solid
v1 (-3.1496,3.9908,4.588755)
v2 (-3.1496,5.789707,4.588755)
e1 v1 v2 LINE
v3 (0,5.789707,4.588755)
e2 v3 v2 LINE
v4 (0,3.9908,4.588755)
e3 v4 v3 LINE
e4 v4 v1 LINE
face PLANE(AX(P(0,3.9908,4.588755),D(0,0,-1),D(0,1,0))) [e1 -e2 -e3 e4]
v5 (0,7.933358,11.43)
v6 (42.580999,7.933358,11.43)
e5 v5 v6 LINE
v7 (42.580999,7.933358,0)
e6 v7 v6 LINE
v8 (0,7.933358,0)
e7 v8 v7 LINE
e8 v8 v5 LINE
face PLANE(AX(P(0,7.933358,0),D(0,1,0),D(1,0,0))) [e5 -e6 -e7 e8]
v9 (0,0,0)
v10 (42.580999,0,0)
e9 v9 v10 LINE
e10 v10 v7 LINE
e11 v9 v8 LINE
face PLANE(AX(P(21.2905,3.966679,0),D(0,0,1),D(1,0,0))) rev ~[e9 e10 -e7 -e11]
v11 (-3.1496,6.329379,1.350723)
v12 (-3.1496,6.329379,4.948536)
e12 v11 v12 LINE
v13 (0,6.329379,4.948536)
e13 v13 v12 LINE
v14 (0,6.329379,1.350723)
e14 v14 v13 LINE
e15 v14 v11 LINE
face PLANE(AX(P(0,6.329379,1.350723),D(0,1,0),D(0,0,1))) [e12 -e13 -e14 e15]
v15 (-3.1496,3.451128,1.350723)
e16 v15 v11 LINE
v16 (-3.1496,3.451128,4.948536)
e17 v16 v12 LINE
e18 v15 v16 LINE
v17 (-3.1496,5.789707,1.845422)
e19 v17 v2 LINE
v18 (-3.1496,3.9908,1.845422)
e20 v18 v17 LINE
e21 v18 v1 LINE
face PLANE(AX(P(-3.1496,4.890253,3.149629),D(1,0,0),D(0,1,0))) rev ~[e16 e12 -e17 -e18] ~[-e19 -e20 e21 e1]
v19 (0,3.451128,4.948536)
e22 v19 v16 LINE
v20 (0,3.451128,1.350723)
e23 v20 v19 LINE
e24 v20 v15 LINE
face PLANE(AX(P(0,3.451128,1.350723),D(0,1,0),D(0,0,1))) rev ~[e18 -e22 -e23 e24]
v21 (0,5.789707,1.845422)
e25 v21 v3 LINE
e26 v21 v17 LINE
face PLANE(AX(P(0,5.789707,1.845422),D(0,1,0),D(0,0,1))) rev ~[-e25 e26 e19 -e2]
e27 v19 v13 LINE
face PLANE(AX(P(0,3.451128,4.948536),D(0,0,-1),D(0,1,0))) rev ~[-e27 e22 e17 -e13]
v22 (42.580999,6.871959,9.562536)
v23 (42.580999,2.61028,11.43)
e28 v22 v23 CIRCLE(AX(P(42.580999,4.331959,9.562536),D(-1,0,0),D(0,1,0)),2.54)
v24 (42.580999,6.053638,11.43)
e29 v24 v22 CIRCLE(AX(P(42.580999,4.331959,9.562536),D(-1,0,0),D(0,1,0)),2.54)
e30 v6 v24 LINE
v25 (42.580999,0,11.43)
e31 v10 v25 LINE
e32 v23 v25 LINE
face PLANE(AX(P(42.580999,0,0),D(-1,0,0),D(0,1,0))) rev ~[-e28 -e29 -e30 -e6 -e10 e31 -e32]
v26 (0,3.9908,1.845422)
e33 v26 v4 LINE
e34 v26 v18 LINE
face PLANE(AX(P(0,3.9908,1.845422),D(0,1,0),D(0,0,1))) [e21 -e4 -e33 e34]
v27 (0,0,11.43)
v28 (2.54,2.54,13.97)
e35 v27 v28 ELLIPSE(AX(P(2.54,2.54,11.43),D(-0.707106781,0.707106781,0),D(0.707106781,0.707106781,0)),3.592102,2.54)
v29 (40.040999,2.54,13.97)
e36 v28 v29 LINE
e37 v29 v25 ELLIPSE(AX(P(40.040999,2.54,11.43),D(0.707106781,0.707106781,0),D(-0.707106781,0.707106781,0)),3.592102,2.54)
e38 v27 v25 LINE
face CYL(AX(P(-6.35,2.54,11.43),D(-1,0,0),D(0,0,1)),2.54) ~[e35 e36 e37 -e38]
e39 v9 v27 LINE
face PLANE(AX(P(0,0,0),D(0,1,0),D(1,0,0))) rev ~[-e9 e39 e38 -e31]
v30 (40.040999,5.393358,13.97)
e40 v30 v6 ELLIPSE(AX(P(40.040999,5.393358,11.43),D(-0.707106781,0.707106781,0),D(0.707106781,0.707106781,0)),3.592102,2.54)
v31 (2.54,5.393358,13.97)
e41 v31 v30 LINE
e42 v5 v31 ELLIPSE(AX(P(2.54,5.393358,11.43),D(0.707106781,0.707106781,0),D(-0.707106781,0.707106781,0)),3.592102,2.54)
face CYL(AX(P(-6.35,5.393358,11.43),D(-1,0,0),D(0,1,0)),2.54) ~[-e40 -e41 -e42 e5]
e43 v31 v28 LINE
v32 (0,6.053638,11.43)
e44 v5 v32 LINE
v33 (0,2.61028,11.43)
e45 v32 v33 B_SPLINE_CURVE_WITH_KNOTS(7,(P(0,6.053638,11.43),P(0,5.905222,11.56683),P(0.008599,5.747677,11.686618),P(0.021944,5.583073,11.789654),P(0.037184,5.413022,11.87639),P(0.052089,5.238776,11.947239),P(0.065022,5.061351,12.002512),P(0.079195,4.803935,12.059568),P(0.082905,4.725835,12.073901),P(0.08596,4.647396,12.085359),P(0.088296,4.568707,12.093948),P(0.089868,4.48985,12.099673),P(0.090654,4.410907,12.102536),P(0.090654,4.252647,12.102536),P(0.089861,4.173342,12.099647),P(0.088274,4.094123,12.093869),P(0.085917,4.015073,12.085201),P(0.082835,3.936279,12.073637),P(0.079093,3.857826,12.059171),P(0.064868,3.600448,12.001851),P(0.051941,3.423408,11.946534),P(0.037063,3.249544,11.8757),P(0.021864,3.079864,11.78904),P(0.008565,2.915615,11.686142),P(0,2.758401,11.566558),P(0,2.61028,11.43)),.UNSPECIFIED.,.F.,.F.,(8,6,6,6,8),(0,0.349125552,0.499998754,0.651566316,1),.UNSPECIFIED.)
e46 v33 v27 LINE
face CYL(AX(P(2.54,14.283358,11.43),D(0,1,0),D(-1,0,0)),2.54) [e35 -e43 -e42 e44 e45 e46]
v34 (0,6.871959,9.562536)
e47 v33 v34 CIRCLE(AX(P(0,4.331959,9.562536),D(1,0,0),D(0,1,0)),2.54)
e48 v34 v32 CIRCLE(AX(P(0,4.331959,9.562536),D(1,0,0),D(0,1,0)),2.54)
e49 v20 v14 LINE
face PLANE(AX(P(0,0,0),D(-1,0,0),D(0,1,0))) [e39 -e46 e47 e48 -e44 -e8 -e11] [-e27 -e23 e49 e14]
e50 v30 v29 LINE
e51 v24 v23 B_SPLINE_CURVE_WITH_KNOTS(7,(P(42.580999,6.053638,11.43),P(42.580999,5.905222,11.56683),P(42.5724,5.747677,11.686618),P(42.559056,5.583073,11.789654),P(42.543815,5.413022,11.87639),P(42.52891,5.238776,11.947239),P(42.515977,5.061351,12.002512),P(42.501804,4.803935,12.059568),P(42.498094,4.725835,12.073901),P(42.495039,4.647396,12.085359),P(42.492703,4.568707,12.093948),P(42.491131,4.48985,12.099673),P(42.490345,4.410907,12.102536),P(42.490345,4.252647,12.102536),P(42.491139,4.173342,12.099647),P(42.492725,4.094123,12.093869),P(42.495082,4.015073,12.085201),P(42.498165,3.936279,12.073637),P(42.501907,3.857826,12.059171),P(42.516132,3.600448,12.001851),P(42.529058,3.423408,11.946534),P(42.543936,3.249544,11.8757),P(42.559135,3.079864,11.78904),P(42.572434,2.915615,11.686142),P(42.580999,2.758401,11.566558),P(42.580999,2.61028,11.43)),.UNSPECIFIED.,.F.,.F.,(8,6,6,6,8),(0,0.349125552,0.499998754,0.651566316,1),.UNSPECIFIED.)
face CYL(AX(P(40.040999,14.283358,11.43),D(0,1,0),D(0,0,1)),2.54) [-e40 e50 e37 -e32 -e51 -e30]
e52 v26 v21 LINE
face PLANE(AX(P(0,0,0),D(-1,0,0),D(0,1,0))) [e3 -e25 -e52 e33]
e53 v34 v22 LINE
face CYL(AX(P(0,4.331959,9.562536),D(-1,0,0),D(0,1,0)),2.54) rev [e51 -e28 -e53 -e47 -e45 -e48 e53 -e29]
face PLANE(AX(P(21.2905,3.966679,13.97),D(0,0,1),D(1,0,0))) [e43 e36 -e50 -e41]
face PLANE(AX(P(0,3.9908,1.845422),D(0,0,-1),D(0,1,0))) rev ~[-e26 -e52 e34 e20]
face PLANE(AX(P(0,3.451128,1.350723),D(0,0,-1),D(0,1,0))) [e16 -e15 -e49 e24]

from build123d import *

# Parameters (mm, degrees)
F0_W        = 42.580999434
F0_H        = 7.9333577305
F1_DEPTH    = 13.97
F2_R        = 2.54
F3_DEPTH    = 45.0342
F4_T1_DEPTH = 20.6333577305
F4_T3_DEPTH = 55.280999434
F5_W        = 2.8782505542
F5_H        = 3.5978133092
F5_W_2      = 1.7989068292
F5_H_2      = 2.7433328796
F6_DEPTH    = 3.1496


# Not quite as in the source:
# - a fillet or chamfer that OpenCascade refuses, or shapes differently, is made with other operations: its cross-section is extruded or revolved along the edge and cut away or added


with BuildPart() as f1:
    # F0 (on Top) → F1 (new body)
    with BuildSketch(Plane.XY):
        with Locations((21.290499717, 3.9666788653)):
            Rectangle(F0_W, F0_H)
    extrude(amount=F1_DEPTH)

    # F2 (on Right) → F3 (cut)
    with BuildSketch(Plane.YZ):
        with Locations((4.3319589458, 9.5625361428)):
            Circle(F2_R)
    extrude(amount=F3_DEPTH, mode=Mode.SUBTRACT)

    # F4: fillet of radius 2.54 on 4 edges, made by hand

    # F4_s2 → F4_t1 (cut)
    with BuildSketch(Plane.XZ.offset(-14.2833577305)):
        with BuildLine():
            ThreePointArc((0, 11.43), (0.7439487758, 13.2260512242), (2.54, 13.97))
            Line((2.54, 13.97), (0, 13.97))
            Line((0, 13.97), (0, 11.43))
        make_face()
        with BuildLine():
            ThreePointArc((40.040999434, 13.97), (41.8370506582, 13.2260512242), (42.580999434, 11.43))
            Line((42.580999434, 11.43), (42.580999434, 13.97))
            Line((42.580999434, 13.97), (40.040999434, 13.97))
        make_face()
    extrude(amount=F4_T1_DEPTH, mode=Mode.SUBTRACT)

    # F4_s4 → F4_t3 (cut)
    with BuildSketch(Plane.YZ.offset(-6.35)):
        with BuildLine():
            ThreePointArc((7.9333577305, 11.43), (7.1894089547, 13.2260512242), (5.3933577305, 13.97))
            Line((5.3933577305, 13.97), (7.9333577305, 13.97))
            Line((7.9333577305, 13.97), (7.9333577305, 11.43))
        make_face()
        with BuildLine():
            ThreePointArc((2.54, 13.97), (0.7439487758, 13.2260512242), (0, 11.43))
            Line((0, 11.43), (0, 13.97))
            Line((0, 13.97), (2.54, 13.97))
        make_face()
    extrude(amount=F4_T3_DEPTH, mode=Mode.SUBTRACT)

    # F5 (on Right) → F6 (join)
    with BuildSketch(Plane.YZ):
        with Locations((4.8902533017, 3.1496292795)):
            Rectangle(F5_W, F5_H)
        with Locations((4.8902535345, 3.2170884078)):
            Rectangle(F5_W_2, F5_H_2, mode=Mode.SUBTRACT)
    extrude(amount=-F6_DEPTH)


solid = f1.part
